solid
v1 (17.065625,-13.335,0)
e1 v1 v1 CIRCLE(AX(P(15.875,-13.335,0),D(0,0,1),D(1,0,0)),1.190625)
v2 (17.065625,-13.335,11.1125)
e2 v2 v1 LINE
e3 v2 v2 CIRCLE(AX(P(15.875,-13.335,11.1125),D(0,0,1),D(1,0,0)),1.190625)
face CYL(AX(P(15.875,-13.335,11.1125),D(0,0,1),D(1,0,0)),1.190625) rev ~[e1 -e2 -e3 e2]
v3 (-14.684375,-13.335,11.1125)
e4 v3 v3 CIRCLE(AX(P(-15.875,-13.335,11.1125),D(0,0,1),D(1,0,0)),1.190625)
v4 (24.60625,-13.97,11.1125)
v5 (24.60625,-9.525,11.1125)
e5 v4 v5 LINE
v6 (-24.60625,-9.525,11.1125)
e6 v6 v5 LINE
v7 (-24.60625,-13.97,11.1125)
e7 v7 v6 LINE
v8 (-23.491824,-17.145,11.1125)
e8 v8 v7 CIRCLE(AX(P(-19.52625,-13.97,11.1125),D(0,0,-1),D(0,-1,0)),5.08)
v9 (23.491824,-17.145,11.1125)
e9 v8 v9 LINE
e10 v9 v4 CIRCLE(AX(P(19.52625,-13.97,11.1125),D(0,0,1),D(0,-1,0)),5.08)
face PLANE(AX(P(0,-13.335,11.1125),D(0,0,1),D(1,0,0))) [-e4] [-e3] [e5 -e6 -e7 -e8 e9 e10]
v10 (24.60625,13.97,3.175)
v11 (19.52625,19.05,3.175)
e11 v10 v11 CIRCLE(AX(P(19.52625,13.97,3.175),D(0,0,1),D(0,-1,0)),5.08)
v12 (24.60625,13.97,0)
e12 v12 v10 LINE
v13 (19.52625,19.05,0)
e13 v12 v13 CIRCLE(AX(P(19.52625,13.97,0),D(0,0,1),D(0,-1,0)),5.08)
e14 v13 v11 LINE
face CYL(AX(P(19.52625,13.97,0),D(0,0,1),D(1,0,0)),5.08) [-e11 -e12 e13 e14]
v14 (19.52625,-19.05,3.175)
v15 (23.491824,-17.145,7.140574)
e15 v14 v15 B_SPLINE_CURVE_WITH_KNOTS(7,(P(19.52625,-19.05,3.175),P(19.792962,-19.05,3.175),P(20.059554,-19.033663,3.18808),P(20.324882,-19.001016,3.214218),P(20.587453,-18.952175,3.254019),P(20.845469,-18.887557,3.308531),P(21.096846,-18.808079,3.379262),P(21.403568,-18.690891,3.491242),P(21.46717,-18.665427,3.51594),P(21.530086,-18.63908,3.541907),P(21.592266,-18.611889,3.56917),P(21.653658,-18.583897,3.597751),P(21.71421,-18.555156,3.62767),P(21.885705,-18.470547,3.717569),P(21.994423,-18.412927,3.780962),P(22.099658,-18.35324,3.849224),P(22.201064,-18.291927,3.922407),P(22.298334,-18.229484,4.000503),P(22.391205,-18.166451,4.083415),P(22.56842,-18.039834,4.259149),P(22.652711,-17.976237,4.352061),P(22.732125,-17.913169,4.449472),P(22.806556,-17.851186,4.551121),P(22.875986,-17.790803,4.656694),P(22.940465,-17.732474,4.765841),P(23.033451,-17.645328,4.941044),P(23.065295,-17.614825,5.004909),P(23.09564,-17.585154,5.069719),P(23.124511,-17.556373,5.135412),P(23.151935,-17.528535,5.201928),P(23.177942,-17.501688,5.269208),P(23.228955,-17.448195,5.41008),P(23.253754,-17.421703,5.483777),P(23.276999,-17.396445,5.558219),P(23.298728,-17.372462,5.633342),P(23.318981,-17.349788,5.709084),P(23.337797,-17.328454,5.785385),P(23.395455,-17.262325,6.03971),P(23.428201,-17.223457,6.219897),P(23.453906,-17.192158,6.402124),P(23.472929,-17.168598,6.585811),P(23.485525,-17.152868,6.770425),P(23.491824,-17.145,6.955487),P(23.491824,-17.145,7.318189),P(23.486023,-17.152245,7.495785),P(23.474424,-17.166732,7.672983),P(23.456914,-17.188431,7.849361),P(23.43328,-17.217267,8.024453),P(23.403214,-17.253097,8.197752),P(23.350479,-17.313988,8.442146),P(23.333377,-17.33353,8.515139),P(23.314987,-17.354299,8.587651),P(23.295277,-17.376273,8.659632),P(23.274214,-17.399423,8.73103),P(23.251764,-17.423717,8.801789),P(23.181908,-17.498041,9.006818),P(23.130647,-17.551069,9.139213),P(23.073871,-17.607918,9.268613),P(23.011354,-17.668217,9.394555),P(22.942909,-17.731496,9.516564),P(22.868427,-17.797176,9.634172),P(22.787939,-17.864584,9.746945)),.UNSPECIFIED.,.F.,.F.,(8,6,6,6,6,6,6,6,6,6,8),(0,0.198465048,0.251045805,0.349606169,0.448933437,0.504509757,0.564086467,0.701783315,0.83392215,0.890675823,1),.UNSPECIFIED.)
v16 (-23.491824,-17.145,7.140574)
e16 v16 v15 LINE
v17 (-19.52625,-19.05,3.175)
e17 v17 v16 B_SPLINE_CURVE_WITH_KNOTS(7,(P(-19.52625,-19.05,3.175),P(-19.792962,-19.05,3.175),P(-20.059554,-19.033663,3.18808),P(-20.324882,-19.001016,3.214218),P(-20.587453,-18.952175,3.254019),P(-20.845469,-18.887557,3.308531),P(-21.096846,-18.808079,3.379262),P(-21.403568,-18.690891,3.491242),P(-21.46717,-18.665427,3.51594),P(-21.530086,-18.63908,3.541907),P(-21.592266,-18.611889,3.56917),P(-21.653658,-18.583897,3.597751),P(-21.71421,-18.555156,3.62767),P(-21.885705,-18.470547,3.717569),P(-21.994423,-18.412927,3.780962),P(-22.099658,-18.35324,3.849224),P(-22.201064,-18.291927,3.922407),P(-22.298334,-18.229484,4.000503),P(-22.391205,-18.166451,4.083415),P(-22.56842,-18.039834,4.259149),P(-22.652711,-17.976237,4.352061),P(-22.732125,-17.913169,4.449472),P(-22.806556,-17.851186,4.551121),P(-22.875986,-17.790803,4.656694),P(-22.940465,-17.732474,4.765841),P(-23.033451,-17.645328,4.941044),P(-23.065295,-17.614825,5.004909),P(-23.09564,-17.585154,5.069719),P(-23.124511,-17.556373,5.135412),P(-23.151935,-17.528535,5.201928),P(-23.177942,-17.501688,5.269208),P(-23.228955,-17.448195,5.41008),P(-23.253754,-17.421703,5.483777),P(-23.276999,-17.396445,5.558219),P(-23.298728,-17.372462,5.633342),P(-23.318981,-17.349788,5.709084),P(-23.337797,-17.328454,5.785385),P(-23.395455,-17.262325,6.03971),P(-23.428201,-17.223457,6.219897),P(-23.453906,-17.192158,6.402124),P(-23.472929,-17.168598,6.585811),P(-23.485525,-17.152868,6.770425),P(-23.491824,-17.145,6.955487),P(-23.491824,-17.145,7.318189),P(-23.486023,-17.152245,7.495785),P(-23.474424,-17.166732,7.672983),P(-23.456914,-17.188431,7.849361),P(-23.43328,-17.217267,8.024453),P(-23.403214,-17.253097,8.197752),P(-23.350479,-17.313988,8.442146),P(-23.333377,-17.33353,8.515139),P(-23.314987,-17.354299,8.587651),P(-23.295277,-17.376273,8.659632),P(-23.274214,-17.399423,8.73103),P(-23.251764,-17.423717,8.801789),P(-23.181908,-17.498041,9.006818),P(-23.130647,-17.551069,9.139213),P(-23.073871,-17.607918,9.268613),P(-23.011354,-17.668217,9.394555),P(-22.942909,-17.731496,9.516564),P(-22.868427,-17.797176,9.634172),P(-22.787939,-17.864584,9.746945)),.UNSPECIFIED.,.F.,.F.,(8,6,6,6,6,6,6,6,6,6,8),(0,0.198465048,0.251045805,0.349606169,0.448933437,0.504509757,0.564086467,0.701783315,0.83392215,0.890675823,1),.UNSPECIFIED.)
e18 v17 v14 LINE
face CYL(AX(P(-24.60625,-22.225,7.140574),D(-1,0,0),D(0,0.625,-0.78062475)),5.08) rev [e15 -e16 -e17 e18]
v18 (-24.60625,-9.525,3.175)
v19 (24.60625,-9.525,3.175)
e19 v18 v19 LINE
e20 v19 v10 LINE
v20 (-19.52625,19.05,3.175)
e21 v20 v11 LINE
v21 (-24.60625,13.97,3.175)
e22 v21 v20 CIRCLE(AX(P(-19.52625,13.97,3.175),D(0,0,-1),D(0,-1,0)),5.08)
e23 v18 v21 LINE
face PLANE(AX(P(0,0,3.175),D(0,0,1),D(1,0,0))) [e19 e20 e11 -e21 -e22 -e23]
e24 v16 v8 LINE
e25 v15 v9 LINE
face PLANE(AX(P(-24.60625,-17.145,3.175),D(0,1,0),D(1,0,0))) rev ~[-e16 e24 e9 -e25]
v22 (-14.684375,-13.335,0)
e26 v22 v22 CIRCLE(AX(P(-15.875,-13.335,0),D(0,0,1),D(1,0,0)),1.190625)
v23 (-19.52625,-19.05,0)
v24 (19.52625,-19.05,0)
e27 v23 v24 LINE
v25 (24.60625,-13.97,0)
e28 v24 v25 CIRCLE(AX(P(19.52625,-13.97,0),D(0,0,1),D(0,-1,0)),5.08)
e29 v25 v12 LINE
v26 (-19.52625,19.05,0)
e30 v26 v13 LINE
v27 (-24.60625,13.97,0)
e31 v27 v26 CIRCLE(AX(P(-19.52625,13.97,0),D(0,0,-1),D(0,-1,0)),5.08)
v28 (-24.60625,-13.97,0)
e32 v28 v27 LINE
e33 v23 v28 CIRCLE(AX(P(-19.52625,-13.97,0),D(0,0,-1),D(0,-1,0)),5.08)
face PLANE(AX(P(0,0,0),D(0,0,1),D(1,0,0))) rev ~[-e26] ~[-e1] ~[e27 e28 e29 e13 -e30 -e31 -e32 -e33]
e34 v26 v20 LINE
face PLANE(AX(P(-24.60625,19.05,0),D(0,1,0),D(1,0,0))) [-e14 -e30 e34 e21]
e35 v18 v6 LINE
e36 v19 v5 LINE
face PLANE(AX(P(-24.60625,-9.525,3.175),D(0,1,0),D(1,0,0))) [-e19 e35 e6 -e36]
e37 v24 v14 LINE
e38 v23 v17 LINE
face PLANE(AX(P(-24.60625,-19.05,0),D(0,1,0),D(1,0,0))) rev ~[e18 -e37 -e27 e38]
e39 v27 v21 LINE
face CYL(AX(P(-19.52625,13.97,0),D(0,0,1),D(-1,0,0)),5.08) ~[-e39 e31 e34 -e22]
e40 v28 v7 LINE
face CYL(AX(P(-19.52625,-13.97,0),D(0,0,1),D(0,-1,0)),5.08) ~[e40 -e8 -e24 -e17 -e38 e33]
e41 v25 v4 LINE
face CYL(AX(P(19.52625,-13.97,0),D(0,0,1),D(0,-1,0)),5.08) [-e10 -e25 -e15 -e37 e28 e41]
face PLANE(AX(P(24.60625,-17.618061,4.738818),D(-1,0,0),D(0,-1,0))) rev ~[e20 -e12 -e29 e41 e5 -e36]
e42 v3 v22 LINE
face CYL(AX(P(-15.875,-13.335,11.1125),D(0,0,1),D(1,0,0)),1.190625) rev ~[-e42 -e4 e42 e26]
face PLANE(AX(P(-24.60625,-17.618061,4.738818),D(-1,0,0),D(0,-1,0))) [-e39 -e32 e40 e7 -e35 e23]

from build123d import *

# Parameters (mm, degrees)
F0_W        = 49.2125
F0_H        = 38.1
F1_DEPTH    = 3.175
F2_W        = 49.2125
F2_H        = 7.62
F3_DEPTH    = 7.9375
F4_R        = 1.190625
F5_DEPTH    = 25.4
F6_T1_DEPTH = 49.2125
F7_R        = 5.08


# Not quite as in the source:
# - a fillet or chamfer that OpenCascade refuses, or shapes differently, is made with other operations: its cross-section is extruded or revolved along the edge and cut away or added


with BuildPart() as f1:
    # F0 (on Top) → F1 (new body)
    with BuildSketch(Plane.XY):
        Rectangle(F0_W, F0_H)
    extrude(amount=F1_DEPTH)

    # F2 (on face) → F3 (join)
    with BuildSketch(Plane.XY.offset(3.175)):
        with Locations((0, -13.335)):
            Rectangle(F2_W, F2_H)
    extrude(amount=F3_DEPTH)

    # F4 (on face) → F5 (cut)
    with BuildSketch(Plane.XY.offset(11.1125)):
        with Locations((-15.875, -13.335)):
            Circle(F4_R)
        with Locations((15.875, -13.335)):
            Circle(F4_R)
    extrude(amount=-F5_DEPTH, mode=Mode.SUBTRACT)

    # F6: fillet of radius 5.08 on 1 edges, made by hand

    # F6_s2 → F6_t1 (join)
    with BuildSketch(Plane.YZ.offset(-24.60625)):
        with BuildLine():
            ThreePointArc((-19.05, 3.175), (-17.6459498802, 4.9408692034), (-17.145, 7.140573729))
            Line((-17.145, 7.140573729), (-17.145, 3.175))
            Line((-17.145, 3.175), (-19.05, 3.175))
        make_face()
    extrude(amount=F6_T1_DEPTH)

    # F7
    f7_edges = [f1.edges().sort_by_distance(p)[0] for p in [
        (-24.60625, -19.05, 1.5875),
        (24.60625, -19.05, 1.5875),
        (24.60625, 19.05, 1.5875),
        (-24.60625, 19.05, 1.5875),
    ]]
    fillet(f7_edges, radius=F7_R)


solid = f1.part
